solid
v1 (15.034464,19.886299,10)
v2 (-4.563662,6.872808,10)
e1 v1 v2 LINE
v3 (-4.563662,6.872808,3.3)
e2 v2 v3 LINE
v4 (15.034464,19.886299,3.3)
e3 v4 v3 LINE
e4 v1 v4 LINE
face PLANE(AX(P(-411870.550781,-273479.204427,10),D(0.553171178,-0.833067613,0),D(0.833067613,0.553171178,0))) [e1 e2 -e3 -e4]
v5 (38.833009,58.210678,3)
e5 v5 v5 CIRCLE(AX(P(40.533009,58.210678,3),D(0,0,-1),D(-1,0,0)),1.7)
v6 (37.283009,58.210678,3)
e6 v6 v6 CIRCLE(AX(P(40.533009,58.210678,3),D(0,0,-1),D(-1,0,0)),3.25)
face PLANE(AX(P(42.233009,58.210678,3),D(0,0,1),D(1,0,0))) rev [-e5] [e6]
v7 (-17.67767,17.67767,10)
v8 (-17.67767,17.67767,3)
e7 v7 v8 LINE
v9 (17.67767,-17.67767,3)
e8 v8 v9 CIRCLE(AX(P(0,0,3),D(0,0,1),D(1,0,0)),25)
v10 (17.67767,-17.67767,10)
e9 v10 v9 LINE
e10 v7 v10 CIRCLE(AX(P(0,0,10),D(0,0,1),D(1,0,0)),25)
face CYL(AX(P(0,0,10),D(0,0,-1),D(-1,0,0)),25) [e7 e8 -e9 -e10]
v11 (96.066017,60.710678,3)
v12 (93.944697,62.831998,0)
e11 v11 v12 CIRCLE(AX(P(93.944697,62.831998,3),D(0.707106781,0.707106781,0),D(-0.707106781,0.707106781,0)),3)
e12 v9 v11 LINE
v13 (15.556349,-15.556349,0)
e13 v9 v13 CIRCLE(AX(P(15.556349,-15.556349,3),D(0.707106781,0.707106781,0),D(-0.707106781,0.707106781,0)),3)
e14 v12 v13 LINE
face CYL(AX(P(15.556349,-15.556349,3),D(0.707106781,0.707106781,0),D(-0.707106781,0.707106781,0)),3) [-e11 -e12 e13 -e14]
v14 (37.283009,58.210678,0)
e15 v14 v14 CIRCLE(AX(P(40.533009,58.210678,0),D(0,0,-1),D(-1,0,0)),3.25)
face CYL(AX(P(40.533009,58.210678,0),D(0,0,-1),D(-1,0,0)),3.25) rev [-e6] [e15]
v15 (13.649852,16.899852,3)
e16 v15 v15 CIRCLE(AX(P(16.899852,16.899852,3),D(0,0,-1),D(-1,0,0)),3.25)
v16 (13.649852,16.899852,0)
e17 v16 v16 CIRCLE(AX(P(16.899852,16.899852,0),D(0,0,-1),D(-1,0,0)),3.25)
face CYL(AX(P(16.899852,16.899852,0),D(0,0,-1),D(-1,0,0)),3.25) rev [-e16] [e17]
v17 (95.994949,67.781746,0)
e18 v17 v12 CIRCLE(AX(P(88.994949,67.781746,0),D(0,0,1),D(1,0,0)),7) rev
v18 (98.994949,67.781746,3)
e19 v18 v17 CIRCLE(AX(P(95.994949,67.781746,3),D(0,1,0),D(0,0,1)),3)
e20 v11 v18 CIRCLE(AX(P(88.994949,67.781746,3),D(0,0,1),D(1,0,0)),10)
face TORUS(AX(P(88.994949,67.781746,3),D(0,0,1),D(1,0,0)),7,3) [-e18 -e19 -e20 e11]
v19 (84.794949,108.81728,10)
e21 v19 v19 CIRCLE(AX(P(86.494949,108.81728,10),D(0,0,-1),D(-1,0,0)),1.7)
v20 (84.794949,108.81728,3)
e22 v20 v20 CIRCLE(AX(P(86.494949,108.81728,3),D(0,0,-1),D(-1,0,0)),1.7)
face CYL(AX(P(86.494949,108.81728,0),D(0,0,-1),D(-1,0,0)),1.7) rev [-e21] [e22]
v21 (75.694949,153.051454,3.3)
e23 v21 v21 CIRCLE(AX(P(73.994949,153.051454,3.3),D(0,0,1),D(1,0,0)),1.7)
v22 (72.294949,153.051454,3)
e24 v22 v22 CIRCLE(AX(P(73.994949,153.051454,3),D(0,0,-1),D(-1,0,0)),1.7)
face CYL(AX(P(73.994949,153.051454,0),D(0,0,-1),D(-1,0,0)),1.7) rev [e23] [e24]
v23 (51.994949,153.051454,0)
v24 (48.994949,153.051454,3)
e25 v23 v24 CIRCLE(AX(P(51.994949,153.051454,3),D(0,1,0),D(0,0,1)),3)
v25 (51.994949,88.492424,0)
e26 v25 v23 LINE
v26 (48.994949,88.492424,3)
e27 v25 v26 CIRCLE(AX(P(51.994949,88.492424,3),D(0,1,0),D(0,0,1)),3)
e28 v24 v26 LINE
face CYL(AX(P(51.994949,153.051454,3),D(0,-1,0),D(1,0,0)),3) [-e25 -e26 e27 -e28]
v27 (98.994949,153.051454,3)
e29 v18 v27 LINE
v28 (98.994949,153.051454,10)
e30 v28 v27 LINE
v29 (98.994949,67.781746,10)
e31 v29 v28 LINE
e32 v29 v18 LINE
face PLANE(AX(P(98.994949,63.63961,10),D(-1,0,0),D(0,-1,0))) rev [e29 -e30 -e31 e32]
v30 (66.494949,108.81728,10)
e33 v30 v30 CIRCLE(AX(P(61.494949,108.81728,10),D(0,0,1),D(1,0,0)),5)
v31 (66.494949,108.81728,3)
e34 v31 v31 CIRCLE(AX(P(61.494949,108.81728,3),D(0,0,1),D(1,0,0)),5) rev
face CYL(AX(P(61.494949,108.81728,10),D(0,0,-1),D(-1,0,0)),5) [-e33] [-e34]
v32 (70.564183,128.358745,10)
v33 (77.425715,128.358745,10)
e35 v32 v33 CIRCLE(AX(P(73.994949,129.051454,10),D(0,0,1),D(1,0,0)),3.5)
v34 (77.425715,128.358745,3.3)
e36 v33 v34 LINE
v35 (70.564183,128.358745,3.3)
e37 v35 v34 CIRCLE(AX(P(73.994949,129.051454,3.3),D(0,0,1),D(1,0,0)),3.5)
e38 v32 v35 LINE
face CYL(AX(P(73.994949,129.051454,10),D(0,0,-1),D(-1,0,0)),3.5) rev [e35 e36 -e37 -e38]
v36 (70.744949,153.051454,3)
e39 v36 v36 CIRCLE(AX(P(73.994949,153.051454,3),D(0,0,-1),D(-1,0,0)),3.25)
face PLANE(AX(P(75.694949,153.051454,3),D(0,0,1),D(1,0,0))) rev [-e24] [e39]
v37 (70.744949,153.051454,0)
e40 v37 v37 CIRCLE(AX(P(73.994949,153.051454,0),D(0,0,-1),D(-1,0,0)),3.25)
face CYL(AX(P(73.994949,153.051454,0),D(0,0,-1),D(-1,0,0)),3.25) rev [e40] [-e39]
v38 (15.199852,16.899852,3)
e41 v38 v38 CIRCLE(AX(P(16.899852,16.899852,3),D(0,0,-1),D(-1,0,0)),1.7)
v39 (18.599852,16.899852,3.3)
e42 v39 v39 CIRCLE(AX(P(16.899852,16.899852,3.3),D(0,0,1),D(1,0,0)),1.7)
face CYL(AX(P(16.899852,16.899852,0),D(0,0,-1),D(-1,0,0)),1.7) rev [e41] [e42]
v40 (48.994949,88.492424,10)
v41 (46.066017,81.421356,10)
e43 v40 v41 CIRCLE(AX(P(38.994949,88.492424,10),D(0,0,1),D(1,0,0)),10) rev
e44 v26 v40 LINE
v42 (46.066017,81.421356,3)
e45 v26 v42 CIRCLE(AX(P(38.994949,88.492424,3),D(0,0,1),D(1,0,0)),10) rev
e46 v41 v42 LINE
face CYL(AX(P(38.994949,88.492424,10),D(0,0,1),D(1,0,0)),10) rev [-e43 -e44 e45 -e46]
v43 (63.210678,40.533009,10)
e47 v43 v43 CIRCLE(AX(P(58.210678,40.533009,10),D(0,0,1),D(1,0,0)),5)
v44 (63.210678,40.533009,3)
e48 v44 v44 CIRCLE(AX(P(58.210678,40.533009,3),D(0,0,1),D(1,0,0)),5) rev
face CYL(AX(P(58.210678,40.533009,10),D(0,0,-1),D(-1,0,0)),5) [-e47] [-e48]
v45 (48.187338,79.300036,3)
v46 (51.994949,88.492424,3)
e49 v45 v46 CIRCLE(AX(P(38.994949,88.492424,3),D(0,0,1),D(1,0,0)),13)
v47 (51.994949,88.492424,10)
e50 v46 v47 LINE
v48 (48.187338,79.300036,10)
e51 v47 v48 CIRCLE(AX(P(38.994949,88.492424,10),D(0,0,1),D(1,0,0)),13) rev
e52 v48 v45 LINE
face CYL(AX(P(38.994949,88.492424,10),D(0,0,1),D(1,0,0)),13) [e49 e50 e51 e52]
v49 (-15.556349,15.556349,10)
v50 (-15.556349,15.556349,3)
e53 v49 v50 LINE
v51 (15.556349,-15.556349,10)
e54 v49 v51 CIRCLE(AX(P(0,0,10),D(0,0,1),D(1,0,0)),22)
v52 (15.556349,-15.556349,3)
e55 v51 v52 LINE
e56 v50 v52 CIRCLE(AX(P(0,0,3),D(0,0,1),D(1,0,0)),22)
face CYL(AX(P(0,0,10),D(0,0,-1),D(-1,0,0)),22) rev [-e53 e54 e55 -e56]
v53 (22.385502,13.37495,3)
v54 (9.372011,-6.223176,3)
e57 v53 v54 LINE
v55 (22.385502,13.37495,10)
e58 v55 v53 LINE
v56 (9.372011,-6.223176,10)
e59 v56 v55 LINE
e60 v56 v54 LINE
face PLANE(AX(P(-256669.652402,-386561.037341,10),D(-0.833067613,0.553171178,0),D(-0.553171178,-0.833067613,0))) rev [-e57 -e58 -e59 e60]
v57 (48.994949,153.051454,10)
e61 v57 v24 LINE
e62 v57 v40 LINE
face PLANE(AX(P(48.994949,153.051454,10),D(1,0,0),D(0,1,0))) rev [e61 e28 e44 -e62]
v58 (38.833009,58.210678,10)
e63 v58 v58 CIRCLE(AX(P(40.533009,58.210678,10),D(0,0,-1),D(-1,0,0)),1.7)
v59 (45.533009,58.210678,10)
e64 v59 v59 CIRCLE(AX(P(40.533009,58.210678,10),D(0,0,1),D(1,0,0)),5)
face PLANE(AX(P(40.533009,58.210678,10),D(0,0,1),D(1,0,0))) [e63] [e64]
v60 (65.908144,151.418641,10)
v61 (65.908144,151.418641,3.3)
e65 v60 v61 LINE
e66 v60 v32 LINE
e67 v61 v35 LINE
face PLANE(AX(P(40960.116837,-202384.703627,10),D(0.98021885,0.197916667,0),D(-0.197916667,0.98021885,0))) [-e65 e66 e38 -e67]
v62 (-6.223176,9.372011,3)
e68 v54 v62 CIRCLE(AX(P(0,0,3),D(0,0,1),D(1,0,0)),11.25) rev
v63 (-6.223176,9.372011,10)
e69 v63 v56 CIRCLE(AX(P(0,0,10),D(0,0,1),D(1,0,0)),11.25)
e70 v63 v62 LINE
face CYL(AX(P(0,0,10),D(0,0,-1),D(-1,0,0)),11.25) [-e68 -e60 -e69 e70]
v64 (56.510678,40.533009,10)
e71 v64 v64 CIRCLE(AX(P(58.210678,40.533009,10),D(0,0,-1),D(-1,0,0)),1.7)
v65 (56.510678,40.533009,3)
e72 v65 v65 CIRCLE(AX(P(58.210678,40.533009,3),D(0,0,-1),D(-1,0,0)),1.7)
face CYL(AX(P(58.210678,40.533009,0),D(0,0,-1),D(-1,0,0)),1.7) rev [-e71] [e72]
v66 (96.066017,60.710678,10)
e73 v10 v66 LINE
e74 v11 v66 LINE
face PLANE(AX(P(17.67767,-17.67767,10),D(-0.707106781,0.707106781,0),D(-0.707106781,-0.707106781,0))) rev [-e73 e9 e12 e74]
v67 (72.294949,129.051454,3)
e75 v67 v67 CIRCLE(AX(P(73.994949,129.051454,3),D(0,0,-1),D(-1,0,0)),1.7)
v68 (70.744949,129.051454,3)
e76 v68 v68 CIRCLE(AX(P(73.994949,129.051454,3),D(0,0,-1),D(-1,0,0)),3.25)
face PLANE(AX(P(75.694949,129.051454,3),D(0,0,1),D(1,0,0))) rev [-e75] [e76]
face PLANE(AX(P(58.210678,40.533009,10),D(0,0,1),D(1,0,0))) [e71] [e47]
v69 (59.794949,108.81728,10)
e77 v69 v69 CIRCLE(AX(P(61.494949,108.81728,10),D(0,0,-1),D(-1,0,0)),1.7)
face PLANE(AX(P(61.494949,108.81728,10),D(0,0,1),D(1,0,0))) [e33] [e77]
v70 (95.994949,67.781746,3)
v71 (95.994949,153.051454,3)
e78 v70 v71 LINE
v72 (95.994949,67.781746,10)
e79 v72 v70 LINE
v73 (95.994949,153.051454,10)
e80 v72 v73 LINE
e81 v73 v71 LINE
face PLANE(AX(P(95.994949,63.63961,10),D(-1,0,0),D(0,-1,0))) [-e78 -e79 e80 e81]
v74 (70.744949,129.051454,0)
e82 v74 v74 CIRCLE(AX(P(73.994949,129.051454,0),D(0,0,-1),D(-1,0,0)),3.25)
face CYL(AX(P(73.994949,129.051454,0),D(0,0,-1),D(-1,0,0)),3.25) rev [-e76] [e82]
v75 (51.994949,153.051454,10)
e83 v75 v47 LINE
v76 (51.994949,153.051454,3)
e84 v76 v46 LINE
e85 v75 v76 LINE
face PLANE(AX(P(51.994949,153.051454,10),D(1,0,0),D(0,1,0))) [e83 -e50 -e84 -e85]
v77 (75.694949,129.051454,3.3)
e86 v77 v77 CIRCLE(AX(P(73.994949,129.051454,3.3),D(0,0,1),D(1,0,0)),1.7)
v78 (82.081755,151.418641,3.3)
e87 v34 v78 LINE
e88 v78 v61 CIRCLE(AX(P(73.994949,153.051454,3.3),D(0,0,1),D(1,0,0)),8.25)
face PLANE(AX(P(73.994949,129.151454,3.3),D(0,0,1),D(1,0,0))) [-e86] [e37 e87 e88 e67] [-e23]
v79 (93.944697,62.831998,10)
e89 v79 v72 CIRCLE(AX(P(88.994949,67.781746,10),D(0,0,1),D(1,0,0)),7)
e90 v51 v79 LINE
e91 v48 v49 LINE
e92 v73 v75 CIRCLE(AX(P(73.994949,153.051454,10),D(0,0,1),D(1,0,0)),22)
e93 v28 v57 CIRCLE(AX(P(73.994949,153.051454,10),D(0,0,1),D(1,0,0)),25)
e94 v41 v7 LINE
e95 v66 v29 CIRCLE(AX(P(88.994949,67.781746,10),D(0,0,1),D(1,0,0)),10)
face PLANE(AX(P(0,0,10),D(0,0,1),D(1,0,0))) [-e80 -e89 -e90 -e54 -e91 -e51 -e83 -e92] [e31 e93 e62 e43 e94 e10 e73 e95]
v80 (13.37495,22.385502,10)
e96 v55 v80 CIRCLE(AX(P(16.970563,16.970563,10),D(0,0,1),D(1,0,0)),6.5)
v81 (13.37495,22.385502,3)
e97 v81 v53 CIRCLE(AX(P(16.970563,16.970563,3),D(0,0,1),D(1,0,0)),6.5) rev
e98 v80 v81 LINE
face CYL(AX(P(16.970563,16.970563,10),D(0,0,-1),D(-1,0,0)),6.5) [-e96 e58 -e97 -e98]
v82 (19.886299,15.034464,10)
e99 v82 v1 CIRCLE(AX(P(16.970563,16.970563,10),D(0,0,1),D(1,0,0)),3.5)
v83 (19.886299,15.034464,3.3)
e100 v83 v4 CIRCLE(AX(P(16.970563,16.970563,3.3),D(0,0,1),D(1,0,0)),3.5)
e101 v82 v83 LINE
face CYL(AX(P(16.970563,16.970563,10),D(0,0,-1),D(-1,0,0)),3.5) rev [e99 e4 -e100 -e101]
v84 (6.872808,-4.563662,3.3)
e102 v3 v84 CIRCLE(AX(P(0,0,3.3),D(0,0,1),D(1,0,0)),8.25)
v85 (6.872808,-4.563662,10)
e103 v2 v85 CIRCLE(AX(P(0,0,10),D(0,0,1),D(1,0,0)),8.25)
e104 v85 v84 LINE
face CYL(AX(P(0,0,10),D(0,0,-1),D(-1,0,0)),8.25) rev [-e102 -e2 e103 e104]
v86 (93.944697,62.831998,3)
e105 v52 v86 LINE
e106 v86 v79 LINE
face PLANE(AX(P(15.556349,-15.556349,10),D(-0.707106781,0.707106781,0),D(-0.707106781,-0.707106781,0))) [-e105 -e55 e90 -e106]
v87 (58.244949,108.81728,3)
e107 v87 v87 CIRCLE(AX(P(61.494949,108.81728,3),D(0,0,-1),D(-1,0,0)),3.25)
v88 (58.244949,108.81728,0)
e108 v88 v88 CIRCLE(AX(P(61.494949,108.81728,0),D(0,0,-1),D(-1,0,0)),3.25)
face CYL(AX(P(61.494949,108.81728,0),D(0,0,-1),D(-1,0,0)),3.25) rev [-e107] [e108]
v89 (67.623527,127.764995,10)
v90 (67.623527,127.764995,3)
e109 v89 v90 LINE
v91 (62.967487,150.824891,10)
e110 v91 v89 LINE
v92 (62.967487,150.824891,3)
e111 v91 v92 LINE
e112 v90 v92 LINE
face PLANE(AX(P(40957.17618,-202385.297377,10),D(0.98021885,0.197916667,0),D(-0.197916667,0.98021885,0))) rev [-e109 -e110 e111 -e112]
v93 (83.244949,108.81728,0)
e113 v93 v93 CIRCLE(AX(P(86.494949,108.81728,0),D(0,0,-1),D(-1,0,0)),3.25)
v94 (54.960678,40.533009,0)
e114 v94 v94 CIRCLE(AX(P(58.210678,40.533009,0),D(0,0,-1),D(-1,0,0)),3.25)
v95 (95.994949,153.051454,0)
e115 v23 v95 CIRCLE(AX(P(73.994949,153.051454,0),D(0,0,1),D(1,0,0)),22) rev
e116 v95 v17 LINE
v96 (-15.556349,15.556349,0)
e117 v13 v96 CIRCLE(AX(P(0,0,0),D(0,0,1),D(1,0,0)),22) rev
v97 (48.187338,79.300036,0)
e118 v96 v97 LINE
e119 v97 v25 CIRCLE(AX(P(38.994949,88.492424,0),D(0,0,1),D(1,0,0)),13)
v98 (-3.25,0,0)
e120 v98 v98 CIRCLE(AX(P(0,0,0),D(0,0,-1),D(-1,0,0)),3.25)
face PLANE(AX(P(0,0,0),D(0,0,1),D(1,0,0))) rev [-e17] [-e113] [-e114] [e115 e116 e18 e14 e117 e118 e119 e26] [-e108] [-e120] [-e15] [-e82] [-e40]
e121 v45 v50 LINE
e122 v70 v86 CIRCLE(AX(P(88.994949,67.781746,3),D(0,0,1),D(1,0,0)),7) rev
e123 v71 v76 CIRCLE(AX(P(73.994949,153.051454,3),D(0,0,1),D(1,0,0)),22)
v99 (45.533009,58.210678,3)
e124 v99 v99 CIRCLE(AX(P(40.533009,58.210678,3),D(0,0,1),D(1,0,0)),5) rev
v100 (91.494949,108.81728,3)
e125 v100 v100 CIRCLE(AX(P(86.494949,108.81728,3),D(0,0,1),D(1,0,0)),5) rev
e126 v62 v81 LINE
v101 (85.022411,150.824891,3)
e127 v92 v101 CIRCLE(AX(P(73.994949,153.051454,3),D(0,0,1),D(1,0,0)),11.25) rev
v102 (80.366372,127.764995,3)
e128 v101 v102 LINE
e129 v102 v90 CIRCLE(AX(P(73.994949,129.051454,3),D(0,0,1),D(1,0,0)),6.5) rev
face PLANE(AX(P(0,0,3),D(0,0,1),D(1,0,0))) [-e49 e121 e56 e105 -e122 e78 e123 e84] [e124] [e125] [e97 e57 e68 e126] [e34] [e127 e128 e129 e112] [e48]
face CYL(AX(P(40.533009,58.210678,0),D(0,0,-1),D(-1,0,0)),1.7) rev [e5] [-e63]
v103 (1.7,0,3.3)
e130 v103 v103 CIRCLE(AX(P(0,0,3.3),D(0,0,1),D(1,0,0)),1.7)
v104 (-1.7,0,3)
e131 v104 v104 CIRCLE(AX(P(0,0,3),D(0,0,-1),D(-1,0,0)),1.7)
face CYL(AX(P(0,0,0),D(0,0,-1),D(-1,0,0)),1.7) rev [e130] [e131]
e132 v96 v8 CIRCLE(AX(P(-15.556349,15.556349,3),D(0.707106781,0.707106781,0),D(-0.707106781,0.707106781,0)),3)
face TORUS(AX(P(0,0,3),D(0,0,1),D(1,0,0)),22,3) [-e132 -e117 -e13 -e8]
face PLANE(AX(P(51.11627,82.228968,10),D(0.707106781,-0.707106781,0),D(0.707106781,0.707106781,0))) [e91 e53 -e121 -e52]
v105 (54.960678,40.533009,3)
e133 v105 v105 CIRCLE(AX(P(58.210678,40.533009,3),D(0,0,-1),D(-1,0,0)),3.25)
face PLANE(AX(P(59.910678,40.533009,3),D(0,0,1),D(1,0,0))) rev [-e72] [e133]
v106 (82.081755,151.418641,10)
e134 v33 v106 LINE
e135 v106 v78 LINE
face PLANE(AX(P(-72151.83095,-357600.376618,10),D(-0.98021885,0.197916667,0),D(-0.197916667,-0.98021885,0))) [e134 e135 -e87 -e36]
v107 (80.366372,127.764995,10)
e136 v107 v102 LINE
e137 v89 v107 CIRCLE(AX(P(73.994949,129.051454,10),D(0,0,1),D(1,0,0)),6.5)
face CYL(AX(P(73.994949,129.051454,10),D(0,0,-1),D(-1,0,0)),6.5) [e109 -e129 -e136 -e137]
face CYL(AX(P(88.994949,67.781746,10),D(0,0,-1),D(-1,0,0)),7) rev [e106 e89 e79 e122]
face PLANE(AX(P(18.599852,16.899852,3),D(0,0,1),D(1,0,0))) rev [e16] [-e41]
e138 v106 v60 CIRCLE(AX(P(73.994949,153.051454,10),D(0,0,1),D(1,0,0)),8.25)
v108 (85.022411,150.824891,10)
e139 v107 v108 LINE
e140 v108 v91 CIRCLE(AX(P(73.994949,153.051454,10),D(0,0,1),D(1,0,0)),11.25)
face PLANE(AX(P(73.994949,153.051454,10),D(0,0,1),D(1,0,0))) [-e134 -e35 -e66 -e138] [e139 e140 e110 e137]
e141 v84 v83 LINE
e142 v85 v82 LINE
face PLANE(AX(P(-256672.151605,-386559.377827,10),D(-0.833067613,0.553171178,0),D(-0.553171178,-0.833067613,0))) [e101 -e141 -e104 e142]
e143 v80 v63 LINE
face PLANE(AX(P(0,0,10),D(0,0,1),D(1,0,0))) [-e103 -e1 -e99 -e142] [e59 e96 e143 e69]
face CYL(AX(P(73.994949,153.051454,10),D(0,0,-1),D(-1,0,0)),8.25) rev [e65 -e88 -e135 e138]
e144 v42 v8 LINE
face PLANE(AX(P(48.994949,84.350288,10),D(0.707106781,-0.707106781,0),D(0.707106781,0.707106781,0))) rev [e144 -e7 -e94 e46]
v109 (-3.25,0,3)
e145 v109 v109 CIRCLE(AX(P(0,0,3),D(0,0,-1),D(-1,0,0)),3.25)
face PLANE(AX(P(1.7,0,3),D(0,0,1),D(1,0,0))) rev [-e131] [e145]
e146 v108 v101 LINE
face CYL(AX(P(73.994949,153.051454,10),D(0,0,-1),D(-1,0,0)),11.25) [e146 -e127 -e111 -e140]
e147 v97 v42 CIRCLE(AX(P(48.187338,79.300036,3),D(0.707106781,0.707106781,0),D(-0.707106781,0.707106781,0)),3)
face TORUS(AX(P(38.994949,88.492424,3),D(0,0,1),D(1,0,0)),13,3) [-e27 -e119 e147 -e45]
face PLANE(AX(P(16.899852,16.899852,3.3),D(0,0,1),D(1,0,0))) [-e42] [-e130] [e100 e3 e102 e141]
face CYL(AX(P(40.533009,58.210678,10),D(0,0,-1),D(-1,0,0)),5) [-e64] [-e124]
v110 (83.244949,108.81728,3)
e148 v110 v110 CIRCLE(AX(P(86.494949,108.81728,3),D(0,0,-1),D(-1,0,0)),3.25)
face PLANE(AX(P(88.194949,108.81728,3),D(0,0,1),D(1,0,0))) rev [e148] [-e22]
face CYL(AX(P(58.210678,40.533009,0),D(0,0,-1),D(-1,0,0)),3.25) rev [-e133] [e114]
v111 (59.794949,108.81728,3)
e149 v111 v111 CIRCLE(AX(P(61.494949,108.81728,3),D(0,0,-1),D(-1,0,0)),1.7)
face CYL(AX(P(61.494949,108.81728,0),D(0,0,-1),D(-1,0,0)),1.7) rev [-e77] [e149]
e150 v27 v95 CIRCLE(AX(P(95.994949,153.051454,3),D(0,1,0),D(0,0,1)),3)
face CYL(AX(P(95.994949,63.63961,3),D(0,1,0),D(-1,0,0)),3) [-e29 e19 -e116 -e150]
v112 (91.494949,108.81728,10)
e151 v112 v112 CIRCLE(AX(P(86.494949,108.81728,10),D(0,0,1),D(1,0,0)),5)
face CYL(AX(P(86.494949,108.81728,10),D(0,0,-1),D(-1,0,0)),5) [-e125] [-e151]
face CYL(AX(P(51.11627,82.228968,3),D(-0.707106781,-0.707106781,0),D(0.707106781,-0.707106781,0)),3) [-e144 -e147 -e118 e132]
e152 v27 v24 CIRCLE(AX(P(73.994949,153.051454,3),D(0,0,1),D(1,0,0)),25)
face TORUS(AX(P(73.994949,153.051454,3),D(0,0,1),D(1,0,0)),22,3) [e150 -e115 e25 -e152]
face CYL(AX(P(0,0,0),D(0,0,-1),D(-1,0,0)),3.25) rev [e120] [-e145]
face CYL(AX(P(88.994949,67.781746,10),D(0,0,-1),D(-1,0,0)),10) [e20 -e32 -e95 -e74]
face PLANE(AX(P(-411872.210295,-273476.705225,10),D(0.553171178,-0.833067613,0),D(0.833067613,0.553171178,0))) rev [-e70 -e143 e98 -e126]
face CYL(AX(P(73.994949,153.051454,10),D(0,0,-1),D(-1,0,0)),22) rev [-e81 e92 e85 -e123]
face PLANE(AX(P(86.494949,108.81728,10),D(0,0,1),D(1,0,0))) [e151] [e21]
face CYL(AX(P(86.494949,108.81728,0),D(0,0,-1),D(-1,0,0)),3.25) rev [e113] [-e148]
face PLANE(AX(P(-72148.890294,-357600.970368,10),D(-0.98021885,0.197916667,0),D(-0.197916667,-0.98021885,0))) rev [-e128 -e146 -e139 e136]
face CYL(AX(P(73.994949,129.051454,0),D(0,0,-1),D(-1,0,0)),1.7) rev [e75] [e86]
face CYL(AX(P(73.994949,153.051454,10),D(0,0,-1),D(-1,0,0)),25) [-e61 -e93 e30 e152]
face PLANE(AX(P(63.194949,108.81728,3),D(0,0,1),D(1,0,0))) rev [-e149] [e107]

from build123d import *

# Parameters (mm, degrees)
BOSS_EXTRUDE1_DEPTH                          = 10
FILLET1_R                                    = 10
SHELL1_T                                     = -3
FILLET4_R                                    = 3
BOSS_EXTRUDE2_START                          = -3
BOSS_EXTRUDE2_DEPTH                          = 10
BOSS_EXTRUDE6_START                          = -3
BOSS_EXTRUDE6_DEPTH                          = 10
SHELL11_START                                = 3
SHELL11_DEPTH                                = 7
BOSS_EXTRUDE5_DEPTH                          = 3.3
BOSS_EXTRUDE8_DEPTH                          = 3.3
CBORE_FOR_M5_HEX_HEAD_CAP_SCREW4_D           = 3.4
CBORE_FOR_M5_HEX_HEAD_CAP_SCREW4_CBORE_D     = 6.5
CBORE_FOR_M5_HEX_HEAD_CAP_SCREW4_CBORE_DEPTH = 3
SKETCH17_R                                   = 5
BOSS_EXTRUDE4_DEPTH                          = 10
CBORE_FOR_M5_HEX_HEAD_CAP_SCREW3_D           = 3.4
CBORE_FOR_M5_HEX_HEAD_CAP_SCREW3_CBORE_D     = 6.5
CBORE_FOR_M5_HEX_HEAD_CAP_SCREW3_CBORE_DEPTH = 3
CBORE_FOR_M5_HEX_HEAD_CAP_SCREW5_D           = 3.4
CBORE_FOR_M5_HEX_HEAD_CAP_SCREW5_DEPTH       = 5.5
CBORE_FOR_M5_HEX_HEAD_CAP_SCREW5_CBORE_D     = 6.5
CBORE_FOR_M5_HEX_HEAD_CAP_SCREW5_CBORE_DEPTH = 3
CBORE_FOR_M5_HEX_HEAD_CAP_SCREW5_TIP         = 1.021463052


# Read off the part's stored shape, not the designer's step: Shell11
with BuildPart() as part:
    # Sketch1 → Boss-Extrude1 (new body)
    with BuildSketch(Plane.XY):
        with BuildLine():
            Line((17.67766953, -17.67766953), (98.994949366, 63.639610307))
            Line((98.994949366, 63.639610307), (98.994949366, 153.051453663))
            ThreePointArc((98.994949366, 153.051453663), (73.994949366, 178.051453663), (48.994949366, 153.051453663))
            Line((48.994949366, 153.051453663), (48.994949366, 84.350288425))
            Line((48.994949366, 84.350288425), (-17.67766953, 17.67766953))
            ThreePointArc((-17.67766953, 17.67766953), (-17.67766953, -17.67766953), (17.67766953, -17.67766953))
        make_face()
    extrude(amount=BOSS_EXTRUDE1_DEPTH)

    # Fillet1
    fillet1_edges = [part.edges().sort_by_distance(p)[0] for p in [
        (48.994949366, 84.350288425, 5),
        (98.994949366, 63.639610307, 5),
    ]]
    fillet(fillet1_edges, radius=FILLET1_R)

    # Shell1
    shell1_openings = [part.faces().sort_by_distance(p)[0] for p in [
        (50.162308395, 71.072674162, 10),
    ]]
    offset(amount=SHELL1_T, openings=shell1_openings, kind=Kind.INTERSECTION)

    # Fillet4
    fillet4_edges = [part.edges().sort_by_distance(p)[0] for p in [
        (98.994949366, 110.416599797, 0),
        (14.194173824, 49.549512883, 0),
        (98.233744691, 63.954911607, 0),
        (48.233744691, 84.665589726, 0),
        (48.994949366, 120.771938856, 0),
        (73.994949366, 178.051453663, 0),
        (56.871843354, 21.516504294, 0),
        (-17.67766953, -17.67766953, 0),
    ]]
    fillet(fillet4_edges, radius=FILLET4_R)

    # Sketch2 → Boss-Extrude2 (add)
    with BuildSketch(Plane.XY.offset(3).offset(BOSS_EXTRUDE2_START)):
        with BuildLine():
            Line((13.374950088, 22.385502231), (-6.223175758, 9.372010643))
            ThreePointArc((-6.223175758, 9.372010643), (-7.954951288, -7.954951288), (9.372010643, -6.223175758))
            Line((9.372010643, -6.223175758), (22.385502231, 13.374950088))
            ThreePointArc((22.385502231, 13.374950088), (21.566756826, 21.566756826), (13.374950088, 22.385502231))
        make_face()
    extrude(amount=BOSS_EXTRUDE2_DEPTH)

    # Sketch21 → Boss-Extrude6 (add)
    with BuildSketch(Plane.XY.offset(3).offset(BOSS_EXTRUDE6_START)):
        with BuildLine():
            Line((80.366371888, 127.764995329), (85.022411424, 150.824891163))
            ThreePointArc((85.022411424, 150.824891163), (73.994949366, 164.301453663), (62.967487308, 150.824891163))
            Line((62.967487308, 150.824891163), (67.623526844, 127.764995329))
            ThreePointArc((67.623526844, 127.764995329), (73.994949366, 122.551453663), (80.366371888, 127.764995329))
        make_face()
    extrude(amount=BOSS_EXTRUDE6_DEPTH)

    # Shell11 outline → Shell11 (cut)
    with BuildSketch(Plane.XY.offset(SHELL11_START)):
        with BuildLine():
            ThreePointArc((70.564183393, 128.35874533), (73.994949366, 125.551453663), (77.42571534, 128.358745329))
            Line((77.42571534, 128.358745329), (82.081754875, 151.418641163))
            ThreePointArc((82.081754875, 151.418641163), (73.994949366, 161.301453663), (65.908143857, 151.418641163))
            Line((65.908143857, 151.418641163), (70.564183393, 128.35874533))
        make_face()
        with BuildLine():
            Line((15.034463624, 19.886299393), (-4.563662222, 6.872807805))
            ThreePointArc((-4.563662222, 6.872807805), (-5.833630945, -5.833630945), (6.872807805, -4.563662222))
            Line((6.872807805, -4.563662222), (19.886299393, 15.034463624))
            ThreePointArc((19.886299393, 15.034463624), (19.445436483, 19.445436483), (15.034463624, 19.886299393))
        make_face()
    extrude(amount=SHELL11_DEPTH, mode=Mode.SUBTRACT)

    # Sketch18 → Boss-Extrude5 (add)
    with BuildSketch(Plane.XY):
        with BuildLine():
            Line((13.308815704, 22.317827505), (-6.21525525, 9.377265176))
            ThreePointArc((-6.21525525, 9.377265176), (-7.954951288, -7.954951288), (9.377265176, -6.21525525))
            Line((9.377265176, -6.21525525), (22.317827505, 13.308815704))
            ThreePointArc((22.317827505, 13.308815704), (21.496046148, 21.496046148), (13.308815704, 22.317827505))
        make_face()
    extrude(amount=BOSS_EXTRUDE5_DEPTH)

    # Sketch25 → Boss-Extrude8 (add)
    with BuildSketch(Plane.XY):
        with BuildLine():
            Line((80.365282703, 127.859612659), (85.020526295, 150.815575002))
            ThreePointArc((85.020526295, 150.815575002), (73.994949366, 164.301453663), (62.969372437, 150.815575002))
            Line((62.969372437, 150.815575002), (67.624616029, 127.859612659))
            ThreePointArc((67.624616029, 127.859612659), (73.994949366, 122.651453663), (80.365282703, 127.859612659))
        make_face()
    extrude(amount=BOSS_EXTRUDE8_DEPTH)

    # CBORE for M5 Hex Head Cap Screw4 (through all)
    with Locations(Plane(origin=(0, 0, 0), x_dir=(-1, 0, 0), z_dir=(0, 0, -1))):
        with Locations((0, 0), (-16.89985207, 16.89985207)):
            CounterBoreHole(CBORE_FOR_M5_HEX_HEAD_CAP_SCREW4_D / 2, CBORE_FOR_M5_HEX_HEAD_CAP_SCREW4_CBORE_D / 2, CBORE_FOR_M5_HEX_HEAD_CAP_SCREW4_CBORE_DEPTH)

    # Sketch17 → Boss-Extrude4 (add)
    with BuildSketch(Plane.XY):
        with Locations((40.533008589, 58.210678119)):
            Circle(SKETCH17_R)
        with Locations((61.494949366, 108.817279836)):
            Circle(SKETCH17_R)
        with Locations((86.494949366, 108.817279836)):
            Circle(SKETCH17_R)
        with Locations((58.210678119, 40.533008589)):
            Circle(SKETCH17_R)
    extrude(amount=BOSS_EXTRUDE4_DEPTH)

    # CBORE for M5 Hex Head Cap Screw3 (through all)
    with Locations(Plane(origin=(0, 0, 0), x_dir=(-1, 0, 0), z_dir=(0, 0, -1))):
        with Locations((-86.494949366, 108.817279836), (-61.494949366, 108.817279836), (-58.210678119, 40.533008589), (-40.533008589, 58.210678119)):
            CounterBoreHole(CBORE_FOR_M5_HEX_HEAD_CAP_SCREW3_D / 2, CBORE_FOR_M5_HEX_HEAD_CAP_SCREW3_CBORE_D / 2, CBORE_FOR_M5_HEX_HEAD_CAP_SCREW3_CBORE_DEPTH)

    # CBORE for M5 Hex Head Cap Screw5
    with Locations(Plane(origin=(0, 0, 0), x_dir=(-1, 0, 0), z_dir=(0, 0, -1))):
        with Locations((-73.994949366, 153.051453663), (-73.994949366, 129.051453663)):
            CounterBoreHole(CBORE_FOR_M5_HEX_HEAD_CAP_SCREW5_D / 2, CBORE_FOR_M5_HEX_HEAD_CAP_SCREW5_CBORE_D / 2, CBORE_FOR_M5_HEX_HEAD_CAP_SCREW5_CBORE_DEPTH, depth=CBORE_FOR_M5_HEX_HEAD_CAP_SCREW5_DEPTH)
            with Locations((0, 0, -(CBORE_FOR_M5_HEX_HEAD_CAP_SCREW5_DEPTH + CBORE_FOR_M5_HEX_HEAD_CAP_SCREW5_TIP / 2))):  # 118° drill point
                Cone(0, CBORE_FOR_M5_HEX_HEAD_CAP_SCREW5_D / 2, CBORE_FOR_M5_HEX_HEAD_CAP_SCREW5_TIP, mode=Mode.SUBTRACT)


solid = part.part
